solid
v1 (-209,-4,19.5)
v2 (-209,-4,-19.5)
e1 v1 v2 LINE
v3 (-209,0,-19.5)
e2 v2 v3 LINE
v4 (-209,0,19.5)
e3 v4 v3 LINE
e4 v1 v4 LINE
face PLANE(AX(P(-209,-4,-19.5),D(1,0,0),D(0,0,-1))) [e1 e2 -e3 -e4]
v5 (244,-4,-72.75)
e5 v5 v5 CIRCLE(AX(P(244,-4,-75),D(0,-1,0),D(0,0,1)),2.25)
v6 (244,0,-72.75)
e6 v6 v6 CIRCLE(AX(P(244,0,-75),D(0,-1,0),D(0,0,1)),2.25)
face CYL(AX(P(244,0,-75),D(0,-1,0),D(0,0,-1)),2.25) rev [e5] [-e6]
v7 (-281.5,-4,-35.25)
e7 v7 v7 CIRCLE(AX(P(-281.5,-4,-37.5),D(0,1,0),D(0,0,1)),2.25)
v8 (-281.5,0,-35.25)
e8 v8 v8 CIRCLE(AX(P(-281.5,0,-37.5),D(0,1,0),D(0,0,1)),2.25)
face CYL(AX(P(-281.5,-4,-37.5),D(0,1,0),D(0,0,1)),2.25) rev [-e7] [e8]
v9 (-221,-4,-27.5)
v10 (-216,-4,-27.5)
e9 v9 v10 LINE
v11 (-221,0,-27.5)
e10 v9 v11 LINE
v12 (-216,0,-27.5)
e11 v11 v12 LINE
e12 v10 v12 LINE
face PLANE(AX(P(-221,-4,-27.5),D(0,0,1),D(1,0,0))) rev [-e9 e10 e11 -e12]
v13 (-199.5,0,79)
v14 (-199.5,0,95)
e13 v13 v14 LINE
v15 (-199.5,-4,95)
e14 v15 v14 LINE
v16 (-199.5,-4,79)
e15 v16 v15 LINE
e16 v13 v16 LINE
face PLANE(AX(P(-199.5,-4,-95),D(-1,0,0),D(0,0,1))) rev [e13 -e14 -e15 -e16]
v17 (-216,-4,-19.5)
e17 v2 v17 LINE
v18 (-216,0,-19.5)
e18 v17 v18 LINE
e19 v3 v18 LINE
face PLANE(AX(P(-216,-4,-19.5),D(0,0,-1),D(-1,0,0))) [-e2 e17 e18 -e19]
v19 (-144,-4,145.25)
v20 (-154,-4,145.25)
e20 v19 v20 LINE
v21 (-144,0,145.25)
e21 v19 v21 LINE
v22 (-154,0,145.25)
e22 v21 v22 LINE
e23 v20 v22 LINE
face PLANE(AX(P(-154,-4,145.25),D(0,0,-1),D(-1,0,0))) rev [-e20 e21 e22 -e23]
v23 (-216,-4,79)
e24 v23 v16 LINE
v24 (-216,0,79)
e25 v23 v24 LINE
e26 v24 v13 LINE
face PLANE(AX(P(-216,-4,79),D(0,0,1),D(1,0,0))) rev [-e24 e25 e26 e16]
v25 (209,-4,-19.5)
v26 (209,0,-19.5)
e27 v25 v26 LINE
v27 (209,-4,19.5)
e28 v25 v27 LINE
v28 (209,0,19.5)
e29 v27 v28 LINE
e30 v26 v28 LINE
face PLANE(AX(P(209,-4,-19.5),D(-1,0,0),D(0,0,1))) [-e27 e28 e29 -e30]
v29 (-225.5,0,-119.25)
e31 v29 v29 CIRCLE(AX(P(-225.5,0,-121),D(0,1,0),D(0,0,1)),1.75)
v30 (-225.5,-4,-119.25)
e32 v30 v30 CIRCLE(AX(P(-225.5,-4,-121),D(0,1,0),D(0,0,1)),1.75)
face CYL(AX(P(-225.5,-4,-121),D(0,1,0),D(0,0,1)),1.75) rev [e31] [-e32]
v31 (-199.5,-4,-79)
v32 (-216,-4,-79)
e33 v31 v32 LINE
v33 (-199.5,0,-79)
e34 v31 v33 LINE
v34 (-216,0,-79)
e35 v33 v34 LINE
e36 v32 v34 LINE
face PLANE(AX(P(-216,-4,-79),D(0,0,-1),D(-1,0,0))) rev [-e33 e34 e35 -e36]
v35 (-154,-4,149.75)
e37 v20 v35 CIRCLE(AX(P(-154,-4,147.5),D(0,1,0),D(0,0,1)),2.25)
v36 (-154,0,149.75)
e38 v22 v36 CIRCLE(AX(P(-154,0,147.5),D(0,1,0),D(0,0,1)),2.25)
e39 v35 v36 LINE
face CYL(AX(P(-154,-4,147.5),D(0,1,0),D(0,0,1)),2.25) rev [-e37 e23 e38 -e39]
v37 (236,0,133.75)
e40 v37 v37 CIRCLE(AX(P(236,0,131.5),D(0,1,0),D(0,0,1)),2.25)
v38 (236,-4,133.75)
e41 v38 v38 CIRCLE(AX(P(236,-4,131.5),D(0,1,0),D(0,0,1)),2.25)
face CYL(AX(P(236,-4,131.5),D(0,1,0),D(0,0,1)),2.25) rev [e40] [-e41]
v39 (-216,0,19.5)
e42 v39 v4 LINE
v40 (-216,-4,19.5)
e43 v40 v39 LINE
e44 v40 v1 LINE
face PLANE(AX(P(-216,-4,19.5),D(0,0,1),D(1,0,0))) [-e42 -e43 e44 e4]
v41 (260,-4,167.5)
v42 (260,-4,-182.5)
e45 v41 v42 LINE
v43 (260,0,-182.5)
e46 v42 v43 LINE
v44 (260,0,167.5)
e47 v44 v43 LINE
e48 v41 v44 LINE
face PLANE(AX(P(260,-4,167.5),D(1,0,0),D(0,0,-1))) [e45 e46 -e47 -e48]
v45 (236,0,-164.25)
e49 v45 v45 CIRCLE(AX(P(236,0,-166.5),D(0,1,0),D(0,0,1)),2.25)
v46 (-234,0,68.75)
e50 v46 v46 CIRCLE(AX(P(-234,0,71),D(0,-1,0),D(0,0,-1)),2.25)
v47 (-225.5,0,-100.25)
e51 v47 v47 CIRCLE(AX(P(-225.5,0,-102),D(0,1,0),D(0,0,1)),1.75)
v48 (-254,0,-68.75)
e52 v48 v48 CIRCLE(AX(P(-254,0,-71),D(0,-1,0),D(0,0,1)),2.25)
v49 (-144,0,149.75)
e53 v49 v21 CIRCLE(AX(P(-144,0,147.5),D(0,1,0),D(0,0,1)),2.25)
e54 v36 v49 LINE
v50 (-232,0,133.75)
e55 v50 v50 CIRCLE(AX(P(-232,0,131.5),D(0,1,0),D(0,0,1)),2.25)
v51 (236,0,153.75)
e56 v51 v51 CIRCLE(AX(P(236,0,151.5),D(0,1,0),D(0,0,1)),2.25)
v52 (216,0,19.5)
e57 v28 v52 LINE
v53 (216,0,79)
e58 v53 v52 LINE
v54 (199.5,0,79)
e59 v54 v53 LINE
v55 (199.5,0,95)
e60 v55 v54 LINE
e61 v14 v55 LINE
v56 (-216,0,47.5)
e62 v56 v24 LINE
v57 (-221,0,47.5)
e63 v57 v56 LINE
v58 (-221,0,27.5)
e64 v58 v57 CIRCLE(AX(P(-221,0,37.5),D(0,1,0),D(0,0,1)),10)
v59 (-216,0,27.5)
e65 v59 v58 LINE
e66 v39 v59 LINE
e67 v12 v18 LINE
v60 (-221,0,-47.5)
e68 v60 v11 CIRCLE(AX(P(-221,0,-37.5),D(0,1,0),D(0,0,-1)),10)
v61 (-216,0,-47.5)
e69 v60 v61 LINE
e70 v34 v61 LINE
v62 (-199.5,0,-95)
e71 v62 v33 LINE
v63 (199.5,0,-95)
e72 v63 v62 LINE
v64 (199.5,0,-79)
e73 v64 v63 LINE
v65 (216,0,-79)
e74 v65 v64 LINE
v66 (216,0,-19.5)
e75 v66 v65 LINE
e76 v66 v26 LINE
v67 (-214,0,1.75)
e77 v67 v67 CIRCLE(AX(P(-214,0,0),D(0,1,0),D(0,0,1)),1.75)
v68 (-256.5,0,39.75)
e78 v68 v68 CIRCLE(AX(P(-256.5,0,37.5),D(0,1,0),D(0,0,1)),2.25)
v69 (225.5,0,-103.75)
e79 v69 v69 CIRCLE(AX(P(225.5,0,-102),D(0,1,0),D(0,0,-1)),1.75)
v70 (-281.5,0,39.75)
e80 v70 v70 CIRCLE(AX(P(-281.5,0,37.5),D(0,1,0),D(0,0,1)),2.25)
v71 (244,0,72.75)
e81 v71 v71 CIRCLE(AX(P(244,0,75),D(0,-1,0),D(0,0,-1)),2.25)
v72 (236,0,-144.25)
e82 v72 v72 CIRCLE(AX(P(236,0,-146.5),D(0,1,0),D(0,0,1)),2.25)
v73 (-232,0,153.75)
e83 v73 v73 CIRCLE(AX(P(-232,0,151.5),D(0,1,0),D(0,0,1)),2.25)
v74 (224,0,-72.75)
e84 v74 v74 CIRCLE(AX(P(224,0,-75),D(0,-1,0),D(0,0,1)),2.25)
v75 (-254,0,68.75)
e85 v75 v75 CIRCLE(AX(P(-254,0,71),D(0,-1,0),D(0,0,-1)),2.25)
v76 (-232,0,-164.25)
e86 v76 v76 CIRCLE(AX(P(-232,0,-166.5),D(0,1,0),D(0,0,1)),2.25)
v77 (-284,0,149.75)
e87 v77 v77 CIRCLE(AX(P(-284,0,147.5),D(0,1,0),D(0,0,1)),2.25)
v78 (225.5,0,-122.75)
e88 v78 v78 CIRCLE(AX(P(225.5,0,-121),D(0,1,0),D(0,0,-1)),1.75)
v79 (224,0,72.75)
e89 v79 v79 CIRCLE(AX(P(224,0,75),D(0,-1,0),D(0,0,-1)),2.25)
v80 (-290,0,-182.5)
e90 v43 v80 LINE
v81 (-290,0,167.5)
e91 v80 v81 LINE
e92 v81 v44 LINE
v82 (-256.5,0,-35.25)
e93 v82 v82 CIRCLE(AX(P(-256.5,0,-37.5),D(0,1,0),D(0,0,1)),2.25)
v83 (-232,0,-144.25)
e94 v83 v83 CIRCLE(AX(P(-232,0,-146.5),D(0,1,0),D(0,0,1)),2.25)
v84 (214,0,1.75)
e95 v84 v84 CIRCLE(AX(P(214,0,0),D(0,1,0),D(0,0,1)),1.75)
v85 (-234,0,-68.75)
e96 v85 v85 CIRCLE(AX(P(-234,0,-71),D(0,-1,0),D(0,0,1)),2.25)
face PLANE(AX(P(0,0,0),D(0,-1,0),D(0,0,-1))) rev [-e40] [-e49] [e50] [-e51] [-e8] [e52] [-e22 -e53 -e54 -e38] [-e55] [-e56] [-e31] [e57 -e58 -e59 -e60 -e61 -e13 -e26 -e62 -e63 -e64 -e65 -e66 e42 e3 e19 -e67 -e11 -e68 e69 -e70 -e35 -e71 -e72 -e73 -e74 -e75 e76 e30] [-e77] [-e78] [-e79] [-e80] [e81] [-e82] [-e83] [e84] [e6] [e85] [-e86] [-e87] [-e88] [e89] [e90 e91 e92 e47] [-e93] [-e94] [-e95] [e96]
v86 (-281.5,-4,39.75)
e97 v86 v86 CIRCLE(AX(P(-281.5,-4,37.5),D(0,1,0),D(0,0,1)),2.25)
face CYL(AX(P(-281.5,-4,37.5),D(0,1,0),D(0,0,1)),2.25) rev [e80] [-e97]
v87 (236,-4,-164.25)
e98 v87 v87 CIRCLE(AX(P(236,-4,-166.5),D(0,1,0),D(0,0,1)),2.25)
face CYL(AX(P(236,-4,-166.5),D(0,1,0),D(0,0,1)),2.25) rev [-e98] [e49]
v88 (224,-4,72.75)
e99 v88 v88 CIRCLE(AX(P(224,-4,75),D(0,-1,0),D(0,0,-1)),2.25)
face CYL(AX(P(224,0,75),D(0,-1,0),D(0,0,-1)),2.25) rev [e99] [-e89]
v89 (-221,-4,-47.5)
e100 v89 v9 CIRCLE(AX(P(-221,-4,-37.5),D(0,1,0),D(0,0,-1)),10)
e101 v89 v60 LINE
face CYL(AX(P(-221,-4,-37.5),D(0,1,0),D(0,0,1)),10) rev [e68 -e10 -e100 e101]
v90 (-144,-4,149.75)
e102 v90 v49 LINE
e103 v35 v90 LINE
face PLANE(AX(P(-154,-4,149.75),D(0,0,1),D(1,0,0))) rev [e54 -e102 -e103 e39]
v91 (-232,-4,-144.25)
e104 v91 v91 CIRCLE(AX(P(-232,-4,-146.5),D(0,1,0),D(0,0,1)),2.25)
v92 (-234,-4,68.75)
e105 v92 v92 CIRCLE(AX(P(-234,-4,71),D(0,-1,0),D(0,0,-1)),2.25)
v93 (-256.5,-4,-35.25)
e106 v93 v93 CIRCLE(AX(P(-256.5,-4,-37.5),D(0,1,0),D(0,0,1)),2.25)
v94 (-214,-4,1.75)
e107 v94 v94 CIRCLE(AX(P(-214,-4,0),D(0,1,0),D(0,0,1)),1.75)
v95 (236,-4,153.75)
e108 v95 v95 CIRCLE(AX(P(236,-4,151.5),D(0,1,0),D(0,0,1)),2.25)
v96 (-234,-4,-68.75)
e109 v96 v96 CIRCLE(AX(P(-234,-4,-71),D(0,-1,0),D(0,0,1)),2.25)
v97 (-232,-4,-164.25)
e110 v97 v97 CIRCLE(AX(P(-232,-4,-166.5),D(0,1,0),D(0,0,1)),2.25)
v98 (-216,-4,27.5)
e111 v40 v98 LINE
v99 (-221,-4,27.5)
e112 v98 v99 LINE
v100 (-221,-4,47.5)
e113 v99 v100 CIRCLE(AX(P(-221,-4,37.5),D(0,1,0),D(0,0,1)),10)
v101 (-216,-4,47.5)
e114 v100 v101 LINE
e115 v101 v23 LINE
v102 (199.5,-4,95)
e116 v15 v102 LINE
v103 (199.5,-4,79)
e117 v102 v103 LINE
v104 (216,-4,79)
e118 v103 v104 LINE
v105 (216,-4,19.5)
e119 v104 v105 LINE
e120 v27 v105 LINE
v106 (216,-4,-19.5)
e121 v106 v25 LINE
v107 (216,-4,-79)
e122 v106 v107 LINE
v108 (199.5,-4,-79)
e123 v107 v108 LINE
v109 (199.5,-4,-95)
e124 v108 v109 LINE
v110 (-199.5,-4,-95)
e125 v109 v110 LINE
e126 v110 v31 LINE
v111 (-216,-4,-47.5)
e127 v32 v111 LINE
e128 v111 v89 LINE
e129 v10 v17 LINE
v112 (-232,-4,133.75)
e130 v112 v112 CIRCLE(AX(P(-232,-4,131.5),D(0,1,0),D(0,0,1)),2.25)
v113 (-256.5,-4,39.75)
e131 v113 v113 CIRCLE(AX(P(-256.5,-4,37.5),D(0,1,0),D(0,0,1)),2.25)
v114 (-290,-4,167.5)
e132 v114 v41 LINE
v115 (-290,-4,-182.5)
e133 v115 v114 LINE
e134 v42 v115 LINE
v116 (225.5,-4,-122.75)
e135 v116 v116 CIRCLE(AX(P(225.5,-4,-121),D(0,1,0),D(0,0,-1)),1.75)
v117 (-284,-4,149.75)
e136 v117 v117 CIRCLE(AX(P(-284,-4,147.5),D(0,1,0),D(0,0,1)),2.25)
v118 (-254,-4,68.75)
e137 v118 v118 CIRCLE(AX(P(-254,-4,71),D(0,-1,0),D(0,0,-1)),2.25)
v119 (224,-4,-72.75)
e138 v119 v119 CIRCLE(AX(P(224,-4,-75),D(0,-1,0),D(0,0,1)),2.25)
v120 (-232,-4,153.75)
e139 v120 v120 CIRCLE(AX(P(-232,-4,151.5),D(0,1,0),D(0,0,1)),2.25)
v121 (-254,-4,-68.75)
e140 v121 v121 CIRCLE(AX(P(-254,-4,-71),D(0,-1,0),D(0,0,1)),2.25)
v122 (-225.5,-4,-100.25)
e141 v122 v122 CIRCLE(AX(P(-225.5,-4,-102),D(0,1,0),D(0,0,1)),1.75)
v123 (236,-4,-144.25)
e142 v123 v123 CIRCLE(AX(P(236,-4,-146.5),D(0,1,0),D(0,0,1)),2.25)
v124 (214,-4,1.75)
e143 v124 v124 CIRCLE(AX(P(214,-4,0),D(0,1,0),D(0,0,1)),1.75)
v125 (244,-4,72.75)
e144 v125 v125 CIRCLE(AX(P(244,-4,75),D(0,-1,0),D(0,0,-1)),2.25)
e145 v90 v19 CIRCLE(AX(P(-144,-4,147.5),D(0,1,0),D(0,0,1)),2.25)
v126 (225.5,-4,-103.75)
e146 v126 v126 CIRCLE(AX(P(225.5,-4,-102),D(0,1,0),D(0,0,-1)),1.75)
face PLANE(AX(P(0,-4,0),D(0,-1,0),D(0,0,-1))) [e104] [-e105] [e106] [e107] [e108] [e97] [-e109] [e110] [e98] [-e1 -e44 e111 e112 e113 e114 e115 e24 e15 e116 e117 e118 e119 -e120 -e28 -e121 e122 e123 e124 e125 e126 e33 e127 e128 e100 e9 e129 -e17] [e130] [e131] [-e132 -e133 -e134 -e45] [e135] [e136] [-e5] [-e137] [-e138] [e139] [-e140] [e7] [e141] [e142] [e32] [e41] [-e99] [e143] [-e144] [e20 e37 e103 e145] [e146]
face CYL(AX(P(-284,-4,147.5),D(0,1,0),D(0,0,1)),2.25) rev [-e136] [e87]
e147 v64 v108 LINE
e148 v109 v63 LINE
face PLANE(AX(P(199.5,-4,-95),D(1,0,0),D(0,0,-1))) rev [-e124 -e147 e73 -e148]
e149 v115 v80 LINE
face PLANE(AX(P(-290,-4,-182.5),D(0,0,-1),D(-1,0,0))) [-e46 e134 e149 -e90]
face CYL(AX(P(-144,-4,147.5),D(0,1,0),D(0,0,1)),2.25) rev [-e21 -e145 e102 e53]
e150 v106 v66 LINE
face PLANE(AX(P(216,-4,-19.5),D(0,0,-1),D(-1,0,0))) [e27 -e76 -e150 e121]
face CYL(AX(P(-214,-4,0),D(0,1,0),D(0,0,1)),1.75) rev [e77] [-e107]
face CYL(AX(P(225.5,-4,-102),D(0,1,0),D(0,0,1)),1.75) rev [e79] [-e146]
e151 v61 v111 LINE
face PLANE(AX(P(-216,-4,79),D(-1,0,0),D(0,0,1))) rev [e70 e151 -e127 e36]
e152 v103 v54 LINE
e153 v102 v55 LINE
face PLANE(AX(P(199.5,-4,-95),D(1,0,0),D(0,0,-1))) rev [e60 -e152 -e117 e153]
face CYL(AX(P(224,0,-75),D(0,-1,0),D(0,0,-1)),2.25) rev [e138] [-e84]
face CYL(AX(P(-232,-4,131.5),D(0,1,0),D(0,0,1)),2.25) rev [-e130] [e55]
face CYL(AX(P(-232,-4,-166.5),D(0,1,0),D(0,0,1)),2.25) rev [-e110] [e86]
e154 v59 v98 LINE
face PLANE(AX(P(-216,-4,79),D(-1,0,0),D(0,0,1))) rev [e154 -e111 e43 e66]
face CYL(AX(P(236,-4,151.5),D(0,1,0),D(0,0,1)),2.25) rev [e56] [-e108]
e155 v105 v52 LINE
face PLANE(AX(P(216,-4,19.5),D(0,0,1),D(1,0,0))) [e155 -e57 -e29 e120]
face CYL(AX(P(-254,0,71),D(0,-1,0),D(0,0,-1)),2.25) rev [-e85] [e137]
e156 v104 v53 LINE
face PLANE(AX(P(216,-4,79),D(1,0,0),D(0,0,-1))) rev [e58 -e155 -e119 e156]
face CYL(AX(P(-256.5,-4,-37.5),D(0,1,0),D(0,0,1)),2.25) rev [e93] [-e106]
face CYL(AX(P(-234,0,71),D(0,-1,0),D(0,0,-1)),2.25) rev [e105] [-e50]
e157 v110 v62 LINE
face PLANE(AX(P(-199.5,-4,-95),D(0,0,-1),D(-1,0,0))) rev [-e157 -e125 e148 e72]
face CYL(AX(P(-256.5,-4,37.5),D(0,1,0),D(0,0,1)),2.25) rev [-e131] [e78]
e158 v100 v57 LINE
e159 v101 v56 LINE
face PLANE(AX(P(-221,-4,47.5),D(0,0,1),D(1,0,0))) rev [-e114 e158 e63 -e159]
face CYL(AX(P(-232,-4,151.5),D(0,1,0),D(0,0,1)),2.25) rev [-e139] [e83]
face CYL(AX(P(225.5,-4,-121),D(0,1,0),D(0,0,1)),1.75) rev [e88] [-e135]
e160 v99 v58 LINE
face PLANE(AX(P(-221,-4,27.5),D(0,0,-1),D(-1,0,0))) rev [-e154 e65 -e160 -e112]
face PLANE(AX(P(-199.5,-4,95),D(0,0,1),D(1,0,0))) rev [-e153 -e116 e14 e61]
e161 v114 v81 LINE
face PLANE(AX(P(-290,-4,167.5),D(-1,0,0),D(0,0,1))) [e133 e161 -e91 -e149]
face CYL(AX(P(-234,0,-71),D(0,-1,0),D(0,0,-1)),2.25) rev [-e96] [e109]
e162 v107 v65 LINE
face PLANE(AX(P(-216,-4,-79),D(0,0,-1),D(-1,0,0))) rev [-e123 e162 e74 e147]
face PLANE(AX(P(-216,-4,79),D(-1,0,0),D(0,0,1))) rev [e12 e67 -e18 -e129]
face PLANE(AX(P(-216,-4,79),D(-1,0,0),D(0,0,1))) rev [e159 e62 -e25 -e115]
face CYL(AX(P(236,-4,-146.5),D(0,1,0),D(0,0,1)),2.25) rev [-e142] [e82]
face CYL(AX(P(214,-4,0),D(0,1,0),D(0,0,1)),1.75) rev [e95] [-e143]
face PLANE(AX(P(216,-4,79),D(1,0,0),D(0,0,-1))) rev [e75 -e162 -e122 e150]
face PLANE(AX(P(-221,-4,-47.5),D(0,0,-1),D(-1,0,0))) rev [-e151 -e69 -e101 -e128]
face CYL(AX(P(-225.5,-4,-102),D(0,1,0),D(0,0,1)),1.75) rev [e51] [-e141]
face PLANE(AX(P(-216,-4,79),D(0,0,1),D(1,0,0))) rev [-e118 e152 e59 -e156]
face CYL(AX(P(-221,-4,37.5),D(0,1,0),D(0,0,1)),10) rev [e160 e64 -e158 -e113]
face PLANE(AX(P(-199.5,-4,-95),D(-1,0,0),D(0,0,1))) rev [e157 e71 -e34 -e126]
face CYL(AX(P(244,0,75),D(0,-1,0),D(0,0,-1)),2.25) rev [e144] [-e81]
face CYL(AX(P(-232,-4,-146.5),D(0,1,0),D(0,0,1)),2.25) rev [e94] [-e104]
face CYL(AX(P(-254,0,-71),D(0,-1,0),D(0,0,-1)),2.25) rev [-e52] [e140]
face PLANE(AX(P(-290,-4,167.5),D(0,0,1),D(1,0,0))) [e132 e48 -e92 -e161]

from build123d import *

# Parameters (mm, degrees)
SKETCH1_W           = 550
SKETCH1_H           = 350
SKETCH1_W_2         = 432
SKETCH1_H_2         = 158
BASE_FLANGE1_DEPTH  = 4
SKETCH4_W           = 399
SKETCH4_H           = 190
CUT_EXTRUDE1_DEPTH  = 343.669301222
SKETCH5_R           = 2.25
CUT_EXTRUDE2_DEPTH  = 343.669301222
SKETCH6_R           = 1.75
CUT_EXTRUDE3_DEPTH  = 343.669301222
SKETCH8_R           = 2.25
CUT_EXTRUDE5_DEPTH  = 343.669301222
SKETCH10_R          = 2.25
CUT_EXTRUDE7_DEPTH  = 343.669301222
SKETCH11_W          = 7
SKETCH11_H          = 39
TAB1_DEPTH          = 4
SKETCH12_R          = 1.75
CUT_EXTRUDE8_DEPTH  = 343.669301222
CUT_EXTRUDE9_DEPTH  = 343.669301222
SKETCH14_R          = 2.25
CUT_EXTRUDE10_DEPTH = 343.669301222


# Sheet-metal steps are written as plain solids
with BuildPart() as part:
    # Sketch1 → Base-Flange1 (new body)
    with BuildSketch(Plane(origin=(0, 0, 0), x_dir=(1, 0, 0), z_dir=(0, 1, 0))):
        with Locations((-15, 7.5)):
            Rectangle(SKETCH1_W, SKETCH1_H)
        Rectangle(SKETCH1_W_2, SKETCH1_H_2, mode=Mode.SUBTRACT)
    extrude(amount=-BASE_FLANGE1_DEPTH)

    # Sketch4 → Cut-Extrude1 (cut, through all)
    with BuildSketch(Plane(origin=(0, 0, 0), x_dir=(1, 0, 0), z_dir=(0, 1, 0))):
        Rectangle(SKETCH4_W, SKETCH4_H)
    extrude(amount=-CUT_EXTRUDE1_DEPTH, mode=Mode.SUBTRACT)

    # Sketch5 → Cut-Extrude2 (cut, through all)
    with BuildSketch(Plane.XZ.offset(4)):
        with Locations(Location((-254, 71, 0), (0, 0, 270))):
            Circle(SKETCH5_R)
        with Locations(Location((-234, 71, 0), (0, 0, 270))):
            Circle(SKETCH5_R)
        with Locations(Location((-234, -71, 0), (0, 0, 90))):
            Circle(SKETCH5_R)
        with Locations(Location((-254, -71, 0), (0, 0, 90))):
            Circle(SKETCH5_R)
        with Locations(Location((224, 75, 0), (0, 0, 270))):
            Circle(SKETCH5_R)
        with Locations(Location((244, 75, 0), (0, 0, 270))):
            Circle(SKETCH5_R)
        with Locations(Location((224, -75, 0), (0, 0, 90))):
            Circle(SKETCH5_R)
        with Locations(Location((244, -75, 0), (0, 0, 90))):
            Circle(SKETCH5_R)
    extrude(amount=-CUT_EXTRUDE2_DEPTH, mode=Mode.SUBTRACT)

    # Sketch6 → Cut-Extrude3 (cut, through all)
    with BuildSketch(Plane(origin=(0, 0, 0), x_dir=(1, 0, 0), z_dir=(0, 1, 0))):
        with Locations(Location((-225.5, 102, 0), (0, 0, 270))):
            Circle(SKETCH6_R)
        with Locations(Location((-225.5, 121, 0), (0, 0, 270))):
            Circle(SKETCH6_R)
        with Locations(Location((225.5, 102, 0), (0, 0, 90))):
            Circle(SKETCH6_R)
        with Locations(Location((225.5, 121, 0), (0, 0, 90))):
            Circle(SKETCH6_R)
    extrude(amount=-CUT_EXTRUDE3_DEPTH, mode=Mode.SUBTRACT)

    # Sketch8 → Cut-Extrude5 (cut, through all)
    with BuildSketch(Plane(origin=(0, 0, 0), x_dir=(1, 0, 0), z_dir=(0, 1, 0))):
        with Locations(Location((-232, 146.5, 0), (0, 0, 270))):
            Circle(SKETCH8_R)
        with Locations(Location((-232, 166.5, 0), (0, 0, 270))):
            Circle(SKETCH8_R)
        with Locations(Location((-232, -151.5, 0), (0, 0, 270))):
            Circle(SKETCH8_R)
        with Locations(Location((-232, -131.5, 0), (0, 0, 270))):
            Circle(SKETCH8_R)
        with Locations(Location((236, 146.5, 0), (0, 0, 270))):
            Circle(SKETCH8_R)
        with Locations(Location((236, 166.5, 0), (0, 0, 270))):
            Circle(SKETCH8_R)
        with Locations(Location((236, -151.5, 0), (0, 0, 270))):
            Circle(SKETCH8_R)
        with Locations(Location((236, -131.5, 0), (0, 0, 270))):
            Circle(SKETCH8_R)
    extrude(amount=-CUT_EXTRUDE5_DEPTH, mode=Mode.SUBTRACT)

    # Sketch10 → Cut-Extrude7 (cut, through all)
    with BuildSketch(Plane(origin=(0, 0, 0), x_dir=(1, 0, 0), z_dir=(0, 1, 0))):
        with Locations(Location((-284, -147.5, 0), (0, 0, 270))):
            Circle(SKETCH10_R)
        with BuildLine():
            Line((-154, -145.25), (-144, -145.25))
            ThreePointArc((-144, -145.25), (-141.75, -147.5), (-144, -149.75))
            Line((-144, -149.75), (-154, -149.75))
            ThreePointArc((-154, -149.75), (-156.25, -147.5), (-154, -145.25))
        make_face()
    extrude(amount=-CUT_EXTRUDE7_DEPTH, mode=Mode.SUBTRACT)

    # Sketch11 → Tab1 (add)
    with BuildSketch(Plane(origin=(0, 0, 0), x_dir=(1, 0, 0), z_dir=(0, 1, 0))):
        with Locations((-212.5, 0)):
            Rectangle(SKETCH11_W, SKETCH11_H)
        with Locations((212.5, 0)):
            Rectangle(SKETCH11_W, SKETCH11_H)
    extrude(amount=-TAB1_DEPTH)

    # Sketch12 → Cut-Extrude8 (cut, through all)
    with BuildSketch(Plane(origin=(0, 0, 0), x_dir=(1, 0, 0), z_dir=(0, 1, 0))):
        with Locations(Location((-214, 0, 0), (0, 0, 270))):
            Circle(SKETCH12_R)
        with Locations(Location((214, 0, 0), (0, 0, 270))):
            Circle(SKETCH12_R)
    extrude(amount=-CUT_EXTRUDE8_DEPTH, mode=Mode.SUBTRACT)

    # Sketch13 → Cut-Extrude9 (cut, through all)
    with BuildSketch(Plane(origin=(0, 0, 0), x_dir=(1, 0, 0), z_dir=(0, 1, 0))):
        with BuildLine():
            Line((-221, -27.5), (169.756928825, -27.5))
            ThreePointArc((169.756928825, -27.5), (179.756928825, -37.5), (169.756928825, -47.5))
            Line((169.756928825, -47.5), (-221, -47.5))
            ThreePointArc((-221, -47.5), (-231, -37.5), (-221, -27.5))
        make_face()
        with BuildLine():
            Line((-221, 27.5), (169.756928825, 27.5))
            ThreePointArc((169.756928825, 27.5), (179.756928825, 37.5), (169.756928825, 47.5))
            Line((169.756928825, 47.5), (-221, 47.5))
            ThreePointArc((-221, 47.5), (-231, 37.5), (-221, 27.5))
        make_face()
    extrude(amount=-CUT_EXTRUDE9_DEPTH, mode=Mode.SUBTRACT)

    # Sketch14 → Cut-Extrude10 (cut, through all)
    with BuildSketch(Plane(origin=(0, 0, 0), x_dir=(1, 0, 0), z_dir=(0, 1, 0))):
        with Locations(Location((-281.5, 37.5, 0), (0, 0, 270))):
            Circle(SKETCH14_R)
        with Locations(Location((-256.5, 37.5, 0), (0, 0, 270))):
            Circle(SKETCH14_R)
        with Locations(Location((-281.5, -37.5, 0), (0, 0, 270))):
            Circle(SKETCH14_R)
        with Locations(Location((-256.5, -37.5, 0), (0, 0, 270))):
            Circle(SKETCH14_R)
    extrude(amount=-CUT_EXTRUDE10_DEPTH, mode=Mode.SUBTRACT)


solid = part.part
